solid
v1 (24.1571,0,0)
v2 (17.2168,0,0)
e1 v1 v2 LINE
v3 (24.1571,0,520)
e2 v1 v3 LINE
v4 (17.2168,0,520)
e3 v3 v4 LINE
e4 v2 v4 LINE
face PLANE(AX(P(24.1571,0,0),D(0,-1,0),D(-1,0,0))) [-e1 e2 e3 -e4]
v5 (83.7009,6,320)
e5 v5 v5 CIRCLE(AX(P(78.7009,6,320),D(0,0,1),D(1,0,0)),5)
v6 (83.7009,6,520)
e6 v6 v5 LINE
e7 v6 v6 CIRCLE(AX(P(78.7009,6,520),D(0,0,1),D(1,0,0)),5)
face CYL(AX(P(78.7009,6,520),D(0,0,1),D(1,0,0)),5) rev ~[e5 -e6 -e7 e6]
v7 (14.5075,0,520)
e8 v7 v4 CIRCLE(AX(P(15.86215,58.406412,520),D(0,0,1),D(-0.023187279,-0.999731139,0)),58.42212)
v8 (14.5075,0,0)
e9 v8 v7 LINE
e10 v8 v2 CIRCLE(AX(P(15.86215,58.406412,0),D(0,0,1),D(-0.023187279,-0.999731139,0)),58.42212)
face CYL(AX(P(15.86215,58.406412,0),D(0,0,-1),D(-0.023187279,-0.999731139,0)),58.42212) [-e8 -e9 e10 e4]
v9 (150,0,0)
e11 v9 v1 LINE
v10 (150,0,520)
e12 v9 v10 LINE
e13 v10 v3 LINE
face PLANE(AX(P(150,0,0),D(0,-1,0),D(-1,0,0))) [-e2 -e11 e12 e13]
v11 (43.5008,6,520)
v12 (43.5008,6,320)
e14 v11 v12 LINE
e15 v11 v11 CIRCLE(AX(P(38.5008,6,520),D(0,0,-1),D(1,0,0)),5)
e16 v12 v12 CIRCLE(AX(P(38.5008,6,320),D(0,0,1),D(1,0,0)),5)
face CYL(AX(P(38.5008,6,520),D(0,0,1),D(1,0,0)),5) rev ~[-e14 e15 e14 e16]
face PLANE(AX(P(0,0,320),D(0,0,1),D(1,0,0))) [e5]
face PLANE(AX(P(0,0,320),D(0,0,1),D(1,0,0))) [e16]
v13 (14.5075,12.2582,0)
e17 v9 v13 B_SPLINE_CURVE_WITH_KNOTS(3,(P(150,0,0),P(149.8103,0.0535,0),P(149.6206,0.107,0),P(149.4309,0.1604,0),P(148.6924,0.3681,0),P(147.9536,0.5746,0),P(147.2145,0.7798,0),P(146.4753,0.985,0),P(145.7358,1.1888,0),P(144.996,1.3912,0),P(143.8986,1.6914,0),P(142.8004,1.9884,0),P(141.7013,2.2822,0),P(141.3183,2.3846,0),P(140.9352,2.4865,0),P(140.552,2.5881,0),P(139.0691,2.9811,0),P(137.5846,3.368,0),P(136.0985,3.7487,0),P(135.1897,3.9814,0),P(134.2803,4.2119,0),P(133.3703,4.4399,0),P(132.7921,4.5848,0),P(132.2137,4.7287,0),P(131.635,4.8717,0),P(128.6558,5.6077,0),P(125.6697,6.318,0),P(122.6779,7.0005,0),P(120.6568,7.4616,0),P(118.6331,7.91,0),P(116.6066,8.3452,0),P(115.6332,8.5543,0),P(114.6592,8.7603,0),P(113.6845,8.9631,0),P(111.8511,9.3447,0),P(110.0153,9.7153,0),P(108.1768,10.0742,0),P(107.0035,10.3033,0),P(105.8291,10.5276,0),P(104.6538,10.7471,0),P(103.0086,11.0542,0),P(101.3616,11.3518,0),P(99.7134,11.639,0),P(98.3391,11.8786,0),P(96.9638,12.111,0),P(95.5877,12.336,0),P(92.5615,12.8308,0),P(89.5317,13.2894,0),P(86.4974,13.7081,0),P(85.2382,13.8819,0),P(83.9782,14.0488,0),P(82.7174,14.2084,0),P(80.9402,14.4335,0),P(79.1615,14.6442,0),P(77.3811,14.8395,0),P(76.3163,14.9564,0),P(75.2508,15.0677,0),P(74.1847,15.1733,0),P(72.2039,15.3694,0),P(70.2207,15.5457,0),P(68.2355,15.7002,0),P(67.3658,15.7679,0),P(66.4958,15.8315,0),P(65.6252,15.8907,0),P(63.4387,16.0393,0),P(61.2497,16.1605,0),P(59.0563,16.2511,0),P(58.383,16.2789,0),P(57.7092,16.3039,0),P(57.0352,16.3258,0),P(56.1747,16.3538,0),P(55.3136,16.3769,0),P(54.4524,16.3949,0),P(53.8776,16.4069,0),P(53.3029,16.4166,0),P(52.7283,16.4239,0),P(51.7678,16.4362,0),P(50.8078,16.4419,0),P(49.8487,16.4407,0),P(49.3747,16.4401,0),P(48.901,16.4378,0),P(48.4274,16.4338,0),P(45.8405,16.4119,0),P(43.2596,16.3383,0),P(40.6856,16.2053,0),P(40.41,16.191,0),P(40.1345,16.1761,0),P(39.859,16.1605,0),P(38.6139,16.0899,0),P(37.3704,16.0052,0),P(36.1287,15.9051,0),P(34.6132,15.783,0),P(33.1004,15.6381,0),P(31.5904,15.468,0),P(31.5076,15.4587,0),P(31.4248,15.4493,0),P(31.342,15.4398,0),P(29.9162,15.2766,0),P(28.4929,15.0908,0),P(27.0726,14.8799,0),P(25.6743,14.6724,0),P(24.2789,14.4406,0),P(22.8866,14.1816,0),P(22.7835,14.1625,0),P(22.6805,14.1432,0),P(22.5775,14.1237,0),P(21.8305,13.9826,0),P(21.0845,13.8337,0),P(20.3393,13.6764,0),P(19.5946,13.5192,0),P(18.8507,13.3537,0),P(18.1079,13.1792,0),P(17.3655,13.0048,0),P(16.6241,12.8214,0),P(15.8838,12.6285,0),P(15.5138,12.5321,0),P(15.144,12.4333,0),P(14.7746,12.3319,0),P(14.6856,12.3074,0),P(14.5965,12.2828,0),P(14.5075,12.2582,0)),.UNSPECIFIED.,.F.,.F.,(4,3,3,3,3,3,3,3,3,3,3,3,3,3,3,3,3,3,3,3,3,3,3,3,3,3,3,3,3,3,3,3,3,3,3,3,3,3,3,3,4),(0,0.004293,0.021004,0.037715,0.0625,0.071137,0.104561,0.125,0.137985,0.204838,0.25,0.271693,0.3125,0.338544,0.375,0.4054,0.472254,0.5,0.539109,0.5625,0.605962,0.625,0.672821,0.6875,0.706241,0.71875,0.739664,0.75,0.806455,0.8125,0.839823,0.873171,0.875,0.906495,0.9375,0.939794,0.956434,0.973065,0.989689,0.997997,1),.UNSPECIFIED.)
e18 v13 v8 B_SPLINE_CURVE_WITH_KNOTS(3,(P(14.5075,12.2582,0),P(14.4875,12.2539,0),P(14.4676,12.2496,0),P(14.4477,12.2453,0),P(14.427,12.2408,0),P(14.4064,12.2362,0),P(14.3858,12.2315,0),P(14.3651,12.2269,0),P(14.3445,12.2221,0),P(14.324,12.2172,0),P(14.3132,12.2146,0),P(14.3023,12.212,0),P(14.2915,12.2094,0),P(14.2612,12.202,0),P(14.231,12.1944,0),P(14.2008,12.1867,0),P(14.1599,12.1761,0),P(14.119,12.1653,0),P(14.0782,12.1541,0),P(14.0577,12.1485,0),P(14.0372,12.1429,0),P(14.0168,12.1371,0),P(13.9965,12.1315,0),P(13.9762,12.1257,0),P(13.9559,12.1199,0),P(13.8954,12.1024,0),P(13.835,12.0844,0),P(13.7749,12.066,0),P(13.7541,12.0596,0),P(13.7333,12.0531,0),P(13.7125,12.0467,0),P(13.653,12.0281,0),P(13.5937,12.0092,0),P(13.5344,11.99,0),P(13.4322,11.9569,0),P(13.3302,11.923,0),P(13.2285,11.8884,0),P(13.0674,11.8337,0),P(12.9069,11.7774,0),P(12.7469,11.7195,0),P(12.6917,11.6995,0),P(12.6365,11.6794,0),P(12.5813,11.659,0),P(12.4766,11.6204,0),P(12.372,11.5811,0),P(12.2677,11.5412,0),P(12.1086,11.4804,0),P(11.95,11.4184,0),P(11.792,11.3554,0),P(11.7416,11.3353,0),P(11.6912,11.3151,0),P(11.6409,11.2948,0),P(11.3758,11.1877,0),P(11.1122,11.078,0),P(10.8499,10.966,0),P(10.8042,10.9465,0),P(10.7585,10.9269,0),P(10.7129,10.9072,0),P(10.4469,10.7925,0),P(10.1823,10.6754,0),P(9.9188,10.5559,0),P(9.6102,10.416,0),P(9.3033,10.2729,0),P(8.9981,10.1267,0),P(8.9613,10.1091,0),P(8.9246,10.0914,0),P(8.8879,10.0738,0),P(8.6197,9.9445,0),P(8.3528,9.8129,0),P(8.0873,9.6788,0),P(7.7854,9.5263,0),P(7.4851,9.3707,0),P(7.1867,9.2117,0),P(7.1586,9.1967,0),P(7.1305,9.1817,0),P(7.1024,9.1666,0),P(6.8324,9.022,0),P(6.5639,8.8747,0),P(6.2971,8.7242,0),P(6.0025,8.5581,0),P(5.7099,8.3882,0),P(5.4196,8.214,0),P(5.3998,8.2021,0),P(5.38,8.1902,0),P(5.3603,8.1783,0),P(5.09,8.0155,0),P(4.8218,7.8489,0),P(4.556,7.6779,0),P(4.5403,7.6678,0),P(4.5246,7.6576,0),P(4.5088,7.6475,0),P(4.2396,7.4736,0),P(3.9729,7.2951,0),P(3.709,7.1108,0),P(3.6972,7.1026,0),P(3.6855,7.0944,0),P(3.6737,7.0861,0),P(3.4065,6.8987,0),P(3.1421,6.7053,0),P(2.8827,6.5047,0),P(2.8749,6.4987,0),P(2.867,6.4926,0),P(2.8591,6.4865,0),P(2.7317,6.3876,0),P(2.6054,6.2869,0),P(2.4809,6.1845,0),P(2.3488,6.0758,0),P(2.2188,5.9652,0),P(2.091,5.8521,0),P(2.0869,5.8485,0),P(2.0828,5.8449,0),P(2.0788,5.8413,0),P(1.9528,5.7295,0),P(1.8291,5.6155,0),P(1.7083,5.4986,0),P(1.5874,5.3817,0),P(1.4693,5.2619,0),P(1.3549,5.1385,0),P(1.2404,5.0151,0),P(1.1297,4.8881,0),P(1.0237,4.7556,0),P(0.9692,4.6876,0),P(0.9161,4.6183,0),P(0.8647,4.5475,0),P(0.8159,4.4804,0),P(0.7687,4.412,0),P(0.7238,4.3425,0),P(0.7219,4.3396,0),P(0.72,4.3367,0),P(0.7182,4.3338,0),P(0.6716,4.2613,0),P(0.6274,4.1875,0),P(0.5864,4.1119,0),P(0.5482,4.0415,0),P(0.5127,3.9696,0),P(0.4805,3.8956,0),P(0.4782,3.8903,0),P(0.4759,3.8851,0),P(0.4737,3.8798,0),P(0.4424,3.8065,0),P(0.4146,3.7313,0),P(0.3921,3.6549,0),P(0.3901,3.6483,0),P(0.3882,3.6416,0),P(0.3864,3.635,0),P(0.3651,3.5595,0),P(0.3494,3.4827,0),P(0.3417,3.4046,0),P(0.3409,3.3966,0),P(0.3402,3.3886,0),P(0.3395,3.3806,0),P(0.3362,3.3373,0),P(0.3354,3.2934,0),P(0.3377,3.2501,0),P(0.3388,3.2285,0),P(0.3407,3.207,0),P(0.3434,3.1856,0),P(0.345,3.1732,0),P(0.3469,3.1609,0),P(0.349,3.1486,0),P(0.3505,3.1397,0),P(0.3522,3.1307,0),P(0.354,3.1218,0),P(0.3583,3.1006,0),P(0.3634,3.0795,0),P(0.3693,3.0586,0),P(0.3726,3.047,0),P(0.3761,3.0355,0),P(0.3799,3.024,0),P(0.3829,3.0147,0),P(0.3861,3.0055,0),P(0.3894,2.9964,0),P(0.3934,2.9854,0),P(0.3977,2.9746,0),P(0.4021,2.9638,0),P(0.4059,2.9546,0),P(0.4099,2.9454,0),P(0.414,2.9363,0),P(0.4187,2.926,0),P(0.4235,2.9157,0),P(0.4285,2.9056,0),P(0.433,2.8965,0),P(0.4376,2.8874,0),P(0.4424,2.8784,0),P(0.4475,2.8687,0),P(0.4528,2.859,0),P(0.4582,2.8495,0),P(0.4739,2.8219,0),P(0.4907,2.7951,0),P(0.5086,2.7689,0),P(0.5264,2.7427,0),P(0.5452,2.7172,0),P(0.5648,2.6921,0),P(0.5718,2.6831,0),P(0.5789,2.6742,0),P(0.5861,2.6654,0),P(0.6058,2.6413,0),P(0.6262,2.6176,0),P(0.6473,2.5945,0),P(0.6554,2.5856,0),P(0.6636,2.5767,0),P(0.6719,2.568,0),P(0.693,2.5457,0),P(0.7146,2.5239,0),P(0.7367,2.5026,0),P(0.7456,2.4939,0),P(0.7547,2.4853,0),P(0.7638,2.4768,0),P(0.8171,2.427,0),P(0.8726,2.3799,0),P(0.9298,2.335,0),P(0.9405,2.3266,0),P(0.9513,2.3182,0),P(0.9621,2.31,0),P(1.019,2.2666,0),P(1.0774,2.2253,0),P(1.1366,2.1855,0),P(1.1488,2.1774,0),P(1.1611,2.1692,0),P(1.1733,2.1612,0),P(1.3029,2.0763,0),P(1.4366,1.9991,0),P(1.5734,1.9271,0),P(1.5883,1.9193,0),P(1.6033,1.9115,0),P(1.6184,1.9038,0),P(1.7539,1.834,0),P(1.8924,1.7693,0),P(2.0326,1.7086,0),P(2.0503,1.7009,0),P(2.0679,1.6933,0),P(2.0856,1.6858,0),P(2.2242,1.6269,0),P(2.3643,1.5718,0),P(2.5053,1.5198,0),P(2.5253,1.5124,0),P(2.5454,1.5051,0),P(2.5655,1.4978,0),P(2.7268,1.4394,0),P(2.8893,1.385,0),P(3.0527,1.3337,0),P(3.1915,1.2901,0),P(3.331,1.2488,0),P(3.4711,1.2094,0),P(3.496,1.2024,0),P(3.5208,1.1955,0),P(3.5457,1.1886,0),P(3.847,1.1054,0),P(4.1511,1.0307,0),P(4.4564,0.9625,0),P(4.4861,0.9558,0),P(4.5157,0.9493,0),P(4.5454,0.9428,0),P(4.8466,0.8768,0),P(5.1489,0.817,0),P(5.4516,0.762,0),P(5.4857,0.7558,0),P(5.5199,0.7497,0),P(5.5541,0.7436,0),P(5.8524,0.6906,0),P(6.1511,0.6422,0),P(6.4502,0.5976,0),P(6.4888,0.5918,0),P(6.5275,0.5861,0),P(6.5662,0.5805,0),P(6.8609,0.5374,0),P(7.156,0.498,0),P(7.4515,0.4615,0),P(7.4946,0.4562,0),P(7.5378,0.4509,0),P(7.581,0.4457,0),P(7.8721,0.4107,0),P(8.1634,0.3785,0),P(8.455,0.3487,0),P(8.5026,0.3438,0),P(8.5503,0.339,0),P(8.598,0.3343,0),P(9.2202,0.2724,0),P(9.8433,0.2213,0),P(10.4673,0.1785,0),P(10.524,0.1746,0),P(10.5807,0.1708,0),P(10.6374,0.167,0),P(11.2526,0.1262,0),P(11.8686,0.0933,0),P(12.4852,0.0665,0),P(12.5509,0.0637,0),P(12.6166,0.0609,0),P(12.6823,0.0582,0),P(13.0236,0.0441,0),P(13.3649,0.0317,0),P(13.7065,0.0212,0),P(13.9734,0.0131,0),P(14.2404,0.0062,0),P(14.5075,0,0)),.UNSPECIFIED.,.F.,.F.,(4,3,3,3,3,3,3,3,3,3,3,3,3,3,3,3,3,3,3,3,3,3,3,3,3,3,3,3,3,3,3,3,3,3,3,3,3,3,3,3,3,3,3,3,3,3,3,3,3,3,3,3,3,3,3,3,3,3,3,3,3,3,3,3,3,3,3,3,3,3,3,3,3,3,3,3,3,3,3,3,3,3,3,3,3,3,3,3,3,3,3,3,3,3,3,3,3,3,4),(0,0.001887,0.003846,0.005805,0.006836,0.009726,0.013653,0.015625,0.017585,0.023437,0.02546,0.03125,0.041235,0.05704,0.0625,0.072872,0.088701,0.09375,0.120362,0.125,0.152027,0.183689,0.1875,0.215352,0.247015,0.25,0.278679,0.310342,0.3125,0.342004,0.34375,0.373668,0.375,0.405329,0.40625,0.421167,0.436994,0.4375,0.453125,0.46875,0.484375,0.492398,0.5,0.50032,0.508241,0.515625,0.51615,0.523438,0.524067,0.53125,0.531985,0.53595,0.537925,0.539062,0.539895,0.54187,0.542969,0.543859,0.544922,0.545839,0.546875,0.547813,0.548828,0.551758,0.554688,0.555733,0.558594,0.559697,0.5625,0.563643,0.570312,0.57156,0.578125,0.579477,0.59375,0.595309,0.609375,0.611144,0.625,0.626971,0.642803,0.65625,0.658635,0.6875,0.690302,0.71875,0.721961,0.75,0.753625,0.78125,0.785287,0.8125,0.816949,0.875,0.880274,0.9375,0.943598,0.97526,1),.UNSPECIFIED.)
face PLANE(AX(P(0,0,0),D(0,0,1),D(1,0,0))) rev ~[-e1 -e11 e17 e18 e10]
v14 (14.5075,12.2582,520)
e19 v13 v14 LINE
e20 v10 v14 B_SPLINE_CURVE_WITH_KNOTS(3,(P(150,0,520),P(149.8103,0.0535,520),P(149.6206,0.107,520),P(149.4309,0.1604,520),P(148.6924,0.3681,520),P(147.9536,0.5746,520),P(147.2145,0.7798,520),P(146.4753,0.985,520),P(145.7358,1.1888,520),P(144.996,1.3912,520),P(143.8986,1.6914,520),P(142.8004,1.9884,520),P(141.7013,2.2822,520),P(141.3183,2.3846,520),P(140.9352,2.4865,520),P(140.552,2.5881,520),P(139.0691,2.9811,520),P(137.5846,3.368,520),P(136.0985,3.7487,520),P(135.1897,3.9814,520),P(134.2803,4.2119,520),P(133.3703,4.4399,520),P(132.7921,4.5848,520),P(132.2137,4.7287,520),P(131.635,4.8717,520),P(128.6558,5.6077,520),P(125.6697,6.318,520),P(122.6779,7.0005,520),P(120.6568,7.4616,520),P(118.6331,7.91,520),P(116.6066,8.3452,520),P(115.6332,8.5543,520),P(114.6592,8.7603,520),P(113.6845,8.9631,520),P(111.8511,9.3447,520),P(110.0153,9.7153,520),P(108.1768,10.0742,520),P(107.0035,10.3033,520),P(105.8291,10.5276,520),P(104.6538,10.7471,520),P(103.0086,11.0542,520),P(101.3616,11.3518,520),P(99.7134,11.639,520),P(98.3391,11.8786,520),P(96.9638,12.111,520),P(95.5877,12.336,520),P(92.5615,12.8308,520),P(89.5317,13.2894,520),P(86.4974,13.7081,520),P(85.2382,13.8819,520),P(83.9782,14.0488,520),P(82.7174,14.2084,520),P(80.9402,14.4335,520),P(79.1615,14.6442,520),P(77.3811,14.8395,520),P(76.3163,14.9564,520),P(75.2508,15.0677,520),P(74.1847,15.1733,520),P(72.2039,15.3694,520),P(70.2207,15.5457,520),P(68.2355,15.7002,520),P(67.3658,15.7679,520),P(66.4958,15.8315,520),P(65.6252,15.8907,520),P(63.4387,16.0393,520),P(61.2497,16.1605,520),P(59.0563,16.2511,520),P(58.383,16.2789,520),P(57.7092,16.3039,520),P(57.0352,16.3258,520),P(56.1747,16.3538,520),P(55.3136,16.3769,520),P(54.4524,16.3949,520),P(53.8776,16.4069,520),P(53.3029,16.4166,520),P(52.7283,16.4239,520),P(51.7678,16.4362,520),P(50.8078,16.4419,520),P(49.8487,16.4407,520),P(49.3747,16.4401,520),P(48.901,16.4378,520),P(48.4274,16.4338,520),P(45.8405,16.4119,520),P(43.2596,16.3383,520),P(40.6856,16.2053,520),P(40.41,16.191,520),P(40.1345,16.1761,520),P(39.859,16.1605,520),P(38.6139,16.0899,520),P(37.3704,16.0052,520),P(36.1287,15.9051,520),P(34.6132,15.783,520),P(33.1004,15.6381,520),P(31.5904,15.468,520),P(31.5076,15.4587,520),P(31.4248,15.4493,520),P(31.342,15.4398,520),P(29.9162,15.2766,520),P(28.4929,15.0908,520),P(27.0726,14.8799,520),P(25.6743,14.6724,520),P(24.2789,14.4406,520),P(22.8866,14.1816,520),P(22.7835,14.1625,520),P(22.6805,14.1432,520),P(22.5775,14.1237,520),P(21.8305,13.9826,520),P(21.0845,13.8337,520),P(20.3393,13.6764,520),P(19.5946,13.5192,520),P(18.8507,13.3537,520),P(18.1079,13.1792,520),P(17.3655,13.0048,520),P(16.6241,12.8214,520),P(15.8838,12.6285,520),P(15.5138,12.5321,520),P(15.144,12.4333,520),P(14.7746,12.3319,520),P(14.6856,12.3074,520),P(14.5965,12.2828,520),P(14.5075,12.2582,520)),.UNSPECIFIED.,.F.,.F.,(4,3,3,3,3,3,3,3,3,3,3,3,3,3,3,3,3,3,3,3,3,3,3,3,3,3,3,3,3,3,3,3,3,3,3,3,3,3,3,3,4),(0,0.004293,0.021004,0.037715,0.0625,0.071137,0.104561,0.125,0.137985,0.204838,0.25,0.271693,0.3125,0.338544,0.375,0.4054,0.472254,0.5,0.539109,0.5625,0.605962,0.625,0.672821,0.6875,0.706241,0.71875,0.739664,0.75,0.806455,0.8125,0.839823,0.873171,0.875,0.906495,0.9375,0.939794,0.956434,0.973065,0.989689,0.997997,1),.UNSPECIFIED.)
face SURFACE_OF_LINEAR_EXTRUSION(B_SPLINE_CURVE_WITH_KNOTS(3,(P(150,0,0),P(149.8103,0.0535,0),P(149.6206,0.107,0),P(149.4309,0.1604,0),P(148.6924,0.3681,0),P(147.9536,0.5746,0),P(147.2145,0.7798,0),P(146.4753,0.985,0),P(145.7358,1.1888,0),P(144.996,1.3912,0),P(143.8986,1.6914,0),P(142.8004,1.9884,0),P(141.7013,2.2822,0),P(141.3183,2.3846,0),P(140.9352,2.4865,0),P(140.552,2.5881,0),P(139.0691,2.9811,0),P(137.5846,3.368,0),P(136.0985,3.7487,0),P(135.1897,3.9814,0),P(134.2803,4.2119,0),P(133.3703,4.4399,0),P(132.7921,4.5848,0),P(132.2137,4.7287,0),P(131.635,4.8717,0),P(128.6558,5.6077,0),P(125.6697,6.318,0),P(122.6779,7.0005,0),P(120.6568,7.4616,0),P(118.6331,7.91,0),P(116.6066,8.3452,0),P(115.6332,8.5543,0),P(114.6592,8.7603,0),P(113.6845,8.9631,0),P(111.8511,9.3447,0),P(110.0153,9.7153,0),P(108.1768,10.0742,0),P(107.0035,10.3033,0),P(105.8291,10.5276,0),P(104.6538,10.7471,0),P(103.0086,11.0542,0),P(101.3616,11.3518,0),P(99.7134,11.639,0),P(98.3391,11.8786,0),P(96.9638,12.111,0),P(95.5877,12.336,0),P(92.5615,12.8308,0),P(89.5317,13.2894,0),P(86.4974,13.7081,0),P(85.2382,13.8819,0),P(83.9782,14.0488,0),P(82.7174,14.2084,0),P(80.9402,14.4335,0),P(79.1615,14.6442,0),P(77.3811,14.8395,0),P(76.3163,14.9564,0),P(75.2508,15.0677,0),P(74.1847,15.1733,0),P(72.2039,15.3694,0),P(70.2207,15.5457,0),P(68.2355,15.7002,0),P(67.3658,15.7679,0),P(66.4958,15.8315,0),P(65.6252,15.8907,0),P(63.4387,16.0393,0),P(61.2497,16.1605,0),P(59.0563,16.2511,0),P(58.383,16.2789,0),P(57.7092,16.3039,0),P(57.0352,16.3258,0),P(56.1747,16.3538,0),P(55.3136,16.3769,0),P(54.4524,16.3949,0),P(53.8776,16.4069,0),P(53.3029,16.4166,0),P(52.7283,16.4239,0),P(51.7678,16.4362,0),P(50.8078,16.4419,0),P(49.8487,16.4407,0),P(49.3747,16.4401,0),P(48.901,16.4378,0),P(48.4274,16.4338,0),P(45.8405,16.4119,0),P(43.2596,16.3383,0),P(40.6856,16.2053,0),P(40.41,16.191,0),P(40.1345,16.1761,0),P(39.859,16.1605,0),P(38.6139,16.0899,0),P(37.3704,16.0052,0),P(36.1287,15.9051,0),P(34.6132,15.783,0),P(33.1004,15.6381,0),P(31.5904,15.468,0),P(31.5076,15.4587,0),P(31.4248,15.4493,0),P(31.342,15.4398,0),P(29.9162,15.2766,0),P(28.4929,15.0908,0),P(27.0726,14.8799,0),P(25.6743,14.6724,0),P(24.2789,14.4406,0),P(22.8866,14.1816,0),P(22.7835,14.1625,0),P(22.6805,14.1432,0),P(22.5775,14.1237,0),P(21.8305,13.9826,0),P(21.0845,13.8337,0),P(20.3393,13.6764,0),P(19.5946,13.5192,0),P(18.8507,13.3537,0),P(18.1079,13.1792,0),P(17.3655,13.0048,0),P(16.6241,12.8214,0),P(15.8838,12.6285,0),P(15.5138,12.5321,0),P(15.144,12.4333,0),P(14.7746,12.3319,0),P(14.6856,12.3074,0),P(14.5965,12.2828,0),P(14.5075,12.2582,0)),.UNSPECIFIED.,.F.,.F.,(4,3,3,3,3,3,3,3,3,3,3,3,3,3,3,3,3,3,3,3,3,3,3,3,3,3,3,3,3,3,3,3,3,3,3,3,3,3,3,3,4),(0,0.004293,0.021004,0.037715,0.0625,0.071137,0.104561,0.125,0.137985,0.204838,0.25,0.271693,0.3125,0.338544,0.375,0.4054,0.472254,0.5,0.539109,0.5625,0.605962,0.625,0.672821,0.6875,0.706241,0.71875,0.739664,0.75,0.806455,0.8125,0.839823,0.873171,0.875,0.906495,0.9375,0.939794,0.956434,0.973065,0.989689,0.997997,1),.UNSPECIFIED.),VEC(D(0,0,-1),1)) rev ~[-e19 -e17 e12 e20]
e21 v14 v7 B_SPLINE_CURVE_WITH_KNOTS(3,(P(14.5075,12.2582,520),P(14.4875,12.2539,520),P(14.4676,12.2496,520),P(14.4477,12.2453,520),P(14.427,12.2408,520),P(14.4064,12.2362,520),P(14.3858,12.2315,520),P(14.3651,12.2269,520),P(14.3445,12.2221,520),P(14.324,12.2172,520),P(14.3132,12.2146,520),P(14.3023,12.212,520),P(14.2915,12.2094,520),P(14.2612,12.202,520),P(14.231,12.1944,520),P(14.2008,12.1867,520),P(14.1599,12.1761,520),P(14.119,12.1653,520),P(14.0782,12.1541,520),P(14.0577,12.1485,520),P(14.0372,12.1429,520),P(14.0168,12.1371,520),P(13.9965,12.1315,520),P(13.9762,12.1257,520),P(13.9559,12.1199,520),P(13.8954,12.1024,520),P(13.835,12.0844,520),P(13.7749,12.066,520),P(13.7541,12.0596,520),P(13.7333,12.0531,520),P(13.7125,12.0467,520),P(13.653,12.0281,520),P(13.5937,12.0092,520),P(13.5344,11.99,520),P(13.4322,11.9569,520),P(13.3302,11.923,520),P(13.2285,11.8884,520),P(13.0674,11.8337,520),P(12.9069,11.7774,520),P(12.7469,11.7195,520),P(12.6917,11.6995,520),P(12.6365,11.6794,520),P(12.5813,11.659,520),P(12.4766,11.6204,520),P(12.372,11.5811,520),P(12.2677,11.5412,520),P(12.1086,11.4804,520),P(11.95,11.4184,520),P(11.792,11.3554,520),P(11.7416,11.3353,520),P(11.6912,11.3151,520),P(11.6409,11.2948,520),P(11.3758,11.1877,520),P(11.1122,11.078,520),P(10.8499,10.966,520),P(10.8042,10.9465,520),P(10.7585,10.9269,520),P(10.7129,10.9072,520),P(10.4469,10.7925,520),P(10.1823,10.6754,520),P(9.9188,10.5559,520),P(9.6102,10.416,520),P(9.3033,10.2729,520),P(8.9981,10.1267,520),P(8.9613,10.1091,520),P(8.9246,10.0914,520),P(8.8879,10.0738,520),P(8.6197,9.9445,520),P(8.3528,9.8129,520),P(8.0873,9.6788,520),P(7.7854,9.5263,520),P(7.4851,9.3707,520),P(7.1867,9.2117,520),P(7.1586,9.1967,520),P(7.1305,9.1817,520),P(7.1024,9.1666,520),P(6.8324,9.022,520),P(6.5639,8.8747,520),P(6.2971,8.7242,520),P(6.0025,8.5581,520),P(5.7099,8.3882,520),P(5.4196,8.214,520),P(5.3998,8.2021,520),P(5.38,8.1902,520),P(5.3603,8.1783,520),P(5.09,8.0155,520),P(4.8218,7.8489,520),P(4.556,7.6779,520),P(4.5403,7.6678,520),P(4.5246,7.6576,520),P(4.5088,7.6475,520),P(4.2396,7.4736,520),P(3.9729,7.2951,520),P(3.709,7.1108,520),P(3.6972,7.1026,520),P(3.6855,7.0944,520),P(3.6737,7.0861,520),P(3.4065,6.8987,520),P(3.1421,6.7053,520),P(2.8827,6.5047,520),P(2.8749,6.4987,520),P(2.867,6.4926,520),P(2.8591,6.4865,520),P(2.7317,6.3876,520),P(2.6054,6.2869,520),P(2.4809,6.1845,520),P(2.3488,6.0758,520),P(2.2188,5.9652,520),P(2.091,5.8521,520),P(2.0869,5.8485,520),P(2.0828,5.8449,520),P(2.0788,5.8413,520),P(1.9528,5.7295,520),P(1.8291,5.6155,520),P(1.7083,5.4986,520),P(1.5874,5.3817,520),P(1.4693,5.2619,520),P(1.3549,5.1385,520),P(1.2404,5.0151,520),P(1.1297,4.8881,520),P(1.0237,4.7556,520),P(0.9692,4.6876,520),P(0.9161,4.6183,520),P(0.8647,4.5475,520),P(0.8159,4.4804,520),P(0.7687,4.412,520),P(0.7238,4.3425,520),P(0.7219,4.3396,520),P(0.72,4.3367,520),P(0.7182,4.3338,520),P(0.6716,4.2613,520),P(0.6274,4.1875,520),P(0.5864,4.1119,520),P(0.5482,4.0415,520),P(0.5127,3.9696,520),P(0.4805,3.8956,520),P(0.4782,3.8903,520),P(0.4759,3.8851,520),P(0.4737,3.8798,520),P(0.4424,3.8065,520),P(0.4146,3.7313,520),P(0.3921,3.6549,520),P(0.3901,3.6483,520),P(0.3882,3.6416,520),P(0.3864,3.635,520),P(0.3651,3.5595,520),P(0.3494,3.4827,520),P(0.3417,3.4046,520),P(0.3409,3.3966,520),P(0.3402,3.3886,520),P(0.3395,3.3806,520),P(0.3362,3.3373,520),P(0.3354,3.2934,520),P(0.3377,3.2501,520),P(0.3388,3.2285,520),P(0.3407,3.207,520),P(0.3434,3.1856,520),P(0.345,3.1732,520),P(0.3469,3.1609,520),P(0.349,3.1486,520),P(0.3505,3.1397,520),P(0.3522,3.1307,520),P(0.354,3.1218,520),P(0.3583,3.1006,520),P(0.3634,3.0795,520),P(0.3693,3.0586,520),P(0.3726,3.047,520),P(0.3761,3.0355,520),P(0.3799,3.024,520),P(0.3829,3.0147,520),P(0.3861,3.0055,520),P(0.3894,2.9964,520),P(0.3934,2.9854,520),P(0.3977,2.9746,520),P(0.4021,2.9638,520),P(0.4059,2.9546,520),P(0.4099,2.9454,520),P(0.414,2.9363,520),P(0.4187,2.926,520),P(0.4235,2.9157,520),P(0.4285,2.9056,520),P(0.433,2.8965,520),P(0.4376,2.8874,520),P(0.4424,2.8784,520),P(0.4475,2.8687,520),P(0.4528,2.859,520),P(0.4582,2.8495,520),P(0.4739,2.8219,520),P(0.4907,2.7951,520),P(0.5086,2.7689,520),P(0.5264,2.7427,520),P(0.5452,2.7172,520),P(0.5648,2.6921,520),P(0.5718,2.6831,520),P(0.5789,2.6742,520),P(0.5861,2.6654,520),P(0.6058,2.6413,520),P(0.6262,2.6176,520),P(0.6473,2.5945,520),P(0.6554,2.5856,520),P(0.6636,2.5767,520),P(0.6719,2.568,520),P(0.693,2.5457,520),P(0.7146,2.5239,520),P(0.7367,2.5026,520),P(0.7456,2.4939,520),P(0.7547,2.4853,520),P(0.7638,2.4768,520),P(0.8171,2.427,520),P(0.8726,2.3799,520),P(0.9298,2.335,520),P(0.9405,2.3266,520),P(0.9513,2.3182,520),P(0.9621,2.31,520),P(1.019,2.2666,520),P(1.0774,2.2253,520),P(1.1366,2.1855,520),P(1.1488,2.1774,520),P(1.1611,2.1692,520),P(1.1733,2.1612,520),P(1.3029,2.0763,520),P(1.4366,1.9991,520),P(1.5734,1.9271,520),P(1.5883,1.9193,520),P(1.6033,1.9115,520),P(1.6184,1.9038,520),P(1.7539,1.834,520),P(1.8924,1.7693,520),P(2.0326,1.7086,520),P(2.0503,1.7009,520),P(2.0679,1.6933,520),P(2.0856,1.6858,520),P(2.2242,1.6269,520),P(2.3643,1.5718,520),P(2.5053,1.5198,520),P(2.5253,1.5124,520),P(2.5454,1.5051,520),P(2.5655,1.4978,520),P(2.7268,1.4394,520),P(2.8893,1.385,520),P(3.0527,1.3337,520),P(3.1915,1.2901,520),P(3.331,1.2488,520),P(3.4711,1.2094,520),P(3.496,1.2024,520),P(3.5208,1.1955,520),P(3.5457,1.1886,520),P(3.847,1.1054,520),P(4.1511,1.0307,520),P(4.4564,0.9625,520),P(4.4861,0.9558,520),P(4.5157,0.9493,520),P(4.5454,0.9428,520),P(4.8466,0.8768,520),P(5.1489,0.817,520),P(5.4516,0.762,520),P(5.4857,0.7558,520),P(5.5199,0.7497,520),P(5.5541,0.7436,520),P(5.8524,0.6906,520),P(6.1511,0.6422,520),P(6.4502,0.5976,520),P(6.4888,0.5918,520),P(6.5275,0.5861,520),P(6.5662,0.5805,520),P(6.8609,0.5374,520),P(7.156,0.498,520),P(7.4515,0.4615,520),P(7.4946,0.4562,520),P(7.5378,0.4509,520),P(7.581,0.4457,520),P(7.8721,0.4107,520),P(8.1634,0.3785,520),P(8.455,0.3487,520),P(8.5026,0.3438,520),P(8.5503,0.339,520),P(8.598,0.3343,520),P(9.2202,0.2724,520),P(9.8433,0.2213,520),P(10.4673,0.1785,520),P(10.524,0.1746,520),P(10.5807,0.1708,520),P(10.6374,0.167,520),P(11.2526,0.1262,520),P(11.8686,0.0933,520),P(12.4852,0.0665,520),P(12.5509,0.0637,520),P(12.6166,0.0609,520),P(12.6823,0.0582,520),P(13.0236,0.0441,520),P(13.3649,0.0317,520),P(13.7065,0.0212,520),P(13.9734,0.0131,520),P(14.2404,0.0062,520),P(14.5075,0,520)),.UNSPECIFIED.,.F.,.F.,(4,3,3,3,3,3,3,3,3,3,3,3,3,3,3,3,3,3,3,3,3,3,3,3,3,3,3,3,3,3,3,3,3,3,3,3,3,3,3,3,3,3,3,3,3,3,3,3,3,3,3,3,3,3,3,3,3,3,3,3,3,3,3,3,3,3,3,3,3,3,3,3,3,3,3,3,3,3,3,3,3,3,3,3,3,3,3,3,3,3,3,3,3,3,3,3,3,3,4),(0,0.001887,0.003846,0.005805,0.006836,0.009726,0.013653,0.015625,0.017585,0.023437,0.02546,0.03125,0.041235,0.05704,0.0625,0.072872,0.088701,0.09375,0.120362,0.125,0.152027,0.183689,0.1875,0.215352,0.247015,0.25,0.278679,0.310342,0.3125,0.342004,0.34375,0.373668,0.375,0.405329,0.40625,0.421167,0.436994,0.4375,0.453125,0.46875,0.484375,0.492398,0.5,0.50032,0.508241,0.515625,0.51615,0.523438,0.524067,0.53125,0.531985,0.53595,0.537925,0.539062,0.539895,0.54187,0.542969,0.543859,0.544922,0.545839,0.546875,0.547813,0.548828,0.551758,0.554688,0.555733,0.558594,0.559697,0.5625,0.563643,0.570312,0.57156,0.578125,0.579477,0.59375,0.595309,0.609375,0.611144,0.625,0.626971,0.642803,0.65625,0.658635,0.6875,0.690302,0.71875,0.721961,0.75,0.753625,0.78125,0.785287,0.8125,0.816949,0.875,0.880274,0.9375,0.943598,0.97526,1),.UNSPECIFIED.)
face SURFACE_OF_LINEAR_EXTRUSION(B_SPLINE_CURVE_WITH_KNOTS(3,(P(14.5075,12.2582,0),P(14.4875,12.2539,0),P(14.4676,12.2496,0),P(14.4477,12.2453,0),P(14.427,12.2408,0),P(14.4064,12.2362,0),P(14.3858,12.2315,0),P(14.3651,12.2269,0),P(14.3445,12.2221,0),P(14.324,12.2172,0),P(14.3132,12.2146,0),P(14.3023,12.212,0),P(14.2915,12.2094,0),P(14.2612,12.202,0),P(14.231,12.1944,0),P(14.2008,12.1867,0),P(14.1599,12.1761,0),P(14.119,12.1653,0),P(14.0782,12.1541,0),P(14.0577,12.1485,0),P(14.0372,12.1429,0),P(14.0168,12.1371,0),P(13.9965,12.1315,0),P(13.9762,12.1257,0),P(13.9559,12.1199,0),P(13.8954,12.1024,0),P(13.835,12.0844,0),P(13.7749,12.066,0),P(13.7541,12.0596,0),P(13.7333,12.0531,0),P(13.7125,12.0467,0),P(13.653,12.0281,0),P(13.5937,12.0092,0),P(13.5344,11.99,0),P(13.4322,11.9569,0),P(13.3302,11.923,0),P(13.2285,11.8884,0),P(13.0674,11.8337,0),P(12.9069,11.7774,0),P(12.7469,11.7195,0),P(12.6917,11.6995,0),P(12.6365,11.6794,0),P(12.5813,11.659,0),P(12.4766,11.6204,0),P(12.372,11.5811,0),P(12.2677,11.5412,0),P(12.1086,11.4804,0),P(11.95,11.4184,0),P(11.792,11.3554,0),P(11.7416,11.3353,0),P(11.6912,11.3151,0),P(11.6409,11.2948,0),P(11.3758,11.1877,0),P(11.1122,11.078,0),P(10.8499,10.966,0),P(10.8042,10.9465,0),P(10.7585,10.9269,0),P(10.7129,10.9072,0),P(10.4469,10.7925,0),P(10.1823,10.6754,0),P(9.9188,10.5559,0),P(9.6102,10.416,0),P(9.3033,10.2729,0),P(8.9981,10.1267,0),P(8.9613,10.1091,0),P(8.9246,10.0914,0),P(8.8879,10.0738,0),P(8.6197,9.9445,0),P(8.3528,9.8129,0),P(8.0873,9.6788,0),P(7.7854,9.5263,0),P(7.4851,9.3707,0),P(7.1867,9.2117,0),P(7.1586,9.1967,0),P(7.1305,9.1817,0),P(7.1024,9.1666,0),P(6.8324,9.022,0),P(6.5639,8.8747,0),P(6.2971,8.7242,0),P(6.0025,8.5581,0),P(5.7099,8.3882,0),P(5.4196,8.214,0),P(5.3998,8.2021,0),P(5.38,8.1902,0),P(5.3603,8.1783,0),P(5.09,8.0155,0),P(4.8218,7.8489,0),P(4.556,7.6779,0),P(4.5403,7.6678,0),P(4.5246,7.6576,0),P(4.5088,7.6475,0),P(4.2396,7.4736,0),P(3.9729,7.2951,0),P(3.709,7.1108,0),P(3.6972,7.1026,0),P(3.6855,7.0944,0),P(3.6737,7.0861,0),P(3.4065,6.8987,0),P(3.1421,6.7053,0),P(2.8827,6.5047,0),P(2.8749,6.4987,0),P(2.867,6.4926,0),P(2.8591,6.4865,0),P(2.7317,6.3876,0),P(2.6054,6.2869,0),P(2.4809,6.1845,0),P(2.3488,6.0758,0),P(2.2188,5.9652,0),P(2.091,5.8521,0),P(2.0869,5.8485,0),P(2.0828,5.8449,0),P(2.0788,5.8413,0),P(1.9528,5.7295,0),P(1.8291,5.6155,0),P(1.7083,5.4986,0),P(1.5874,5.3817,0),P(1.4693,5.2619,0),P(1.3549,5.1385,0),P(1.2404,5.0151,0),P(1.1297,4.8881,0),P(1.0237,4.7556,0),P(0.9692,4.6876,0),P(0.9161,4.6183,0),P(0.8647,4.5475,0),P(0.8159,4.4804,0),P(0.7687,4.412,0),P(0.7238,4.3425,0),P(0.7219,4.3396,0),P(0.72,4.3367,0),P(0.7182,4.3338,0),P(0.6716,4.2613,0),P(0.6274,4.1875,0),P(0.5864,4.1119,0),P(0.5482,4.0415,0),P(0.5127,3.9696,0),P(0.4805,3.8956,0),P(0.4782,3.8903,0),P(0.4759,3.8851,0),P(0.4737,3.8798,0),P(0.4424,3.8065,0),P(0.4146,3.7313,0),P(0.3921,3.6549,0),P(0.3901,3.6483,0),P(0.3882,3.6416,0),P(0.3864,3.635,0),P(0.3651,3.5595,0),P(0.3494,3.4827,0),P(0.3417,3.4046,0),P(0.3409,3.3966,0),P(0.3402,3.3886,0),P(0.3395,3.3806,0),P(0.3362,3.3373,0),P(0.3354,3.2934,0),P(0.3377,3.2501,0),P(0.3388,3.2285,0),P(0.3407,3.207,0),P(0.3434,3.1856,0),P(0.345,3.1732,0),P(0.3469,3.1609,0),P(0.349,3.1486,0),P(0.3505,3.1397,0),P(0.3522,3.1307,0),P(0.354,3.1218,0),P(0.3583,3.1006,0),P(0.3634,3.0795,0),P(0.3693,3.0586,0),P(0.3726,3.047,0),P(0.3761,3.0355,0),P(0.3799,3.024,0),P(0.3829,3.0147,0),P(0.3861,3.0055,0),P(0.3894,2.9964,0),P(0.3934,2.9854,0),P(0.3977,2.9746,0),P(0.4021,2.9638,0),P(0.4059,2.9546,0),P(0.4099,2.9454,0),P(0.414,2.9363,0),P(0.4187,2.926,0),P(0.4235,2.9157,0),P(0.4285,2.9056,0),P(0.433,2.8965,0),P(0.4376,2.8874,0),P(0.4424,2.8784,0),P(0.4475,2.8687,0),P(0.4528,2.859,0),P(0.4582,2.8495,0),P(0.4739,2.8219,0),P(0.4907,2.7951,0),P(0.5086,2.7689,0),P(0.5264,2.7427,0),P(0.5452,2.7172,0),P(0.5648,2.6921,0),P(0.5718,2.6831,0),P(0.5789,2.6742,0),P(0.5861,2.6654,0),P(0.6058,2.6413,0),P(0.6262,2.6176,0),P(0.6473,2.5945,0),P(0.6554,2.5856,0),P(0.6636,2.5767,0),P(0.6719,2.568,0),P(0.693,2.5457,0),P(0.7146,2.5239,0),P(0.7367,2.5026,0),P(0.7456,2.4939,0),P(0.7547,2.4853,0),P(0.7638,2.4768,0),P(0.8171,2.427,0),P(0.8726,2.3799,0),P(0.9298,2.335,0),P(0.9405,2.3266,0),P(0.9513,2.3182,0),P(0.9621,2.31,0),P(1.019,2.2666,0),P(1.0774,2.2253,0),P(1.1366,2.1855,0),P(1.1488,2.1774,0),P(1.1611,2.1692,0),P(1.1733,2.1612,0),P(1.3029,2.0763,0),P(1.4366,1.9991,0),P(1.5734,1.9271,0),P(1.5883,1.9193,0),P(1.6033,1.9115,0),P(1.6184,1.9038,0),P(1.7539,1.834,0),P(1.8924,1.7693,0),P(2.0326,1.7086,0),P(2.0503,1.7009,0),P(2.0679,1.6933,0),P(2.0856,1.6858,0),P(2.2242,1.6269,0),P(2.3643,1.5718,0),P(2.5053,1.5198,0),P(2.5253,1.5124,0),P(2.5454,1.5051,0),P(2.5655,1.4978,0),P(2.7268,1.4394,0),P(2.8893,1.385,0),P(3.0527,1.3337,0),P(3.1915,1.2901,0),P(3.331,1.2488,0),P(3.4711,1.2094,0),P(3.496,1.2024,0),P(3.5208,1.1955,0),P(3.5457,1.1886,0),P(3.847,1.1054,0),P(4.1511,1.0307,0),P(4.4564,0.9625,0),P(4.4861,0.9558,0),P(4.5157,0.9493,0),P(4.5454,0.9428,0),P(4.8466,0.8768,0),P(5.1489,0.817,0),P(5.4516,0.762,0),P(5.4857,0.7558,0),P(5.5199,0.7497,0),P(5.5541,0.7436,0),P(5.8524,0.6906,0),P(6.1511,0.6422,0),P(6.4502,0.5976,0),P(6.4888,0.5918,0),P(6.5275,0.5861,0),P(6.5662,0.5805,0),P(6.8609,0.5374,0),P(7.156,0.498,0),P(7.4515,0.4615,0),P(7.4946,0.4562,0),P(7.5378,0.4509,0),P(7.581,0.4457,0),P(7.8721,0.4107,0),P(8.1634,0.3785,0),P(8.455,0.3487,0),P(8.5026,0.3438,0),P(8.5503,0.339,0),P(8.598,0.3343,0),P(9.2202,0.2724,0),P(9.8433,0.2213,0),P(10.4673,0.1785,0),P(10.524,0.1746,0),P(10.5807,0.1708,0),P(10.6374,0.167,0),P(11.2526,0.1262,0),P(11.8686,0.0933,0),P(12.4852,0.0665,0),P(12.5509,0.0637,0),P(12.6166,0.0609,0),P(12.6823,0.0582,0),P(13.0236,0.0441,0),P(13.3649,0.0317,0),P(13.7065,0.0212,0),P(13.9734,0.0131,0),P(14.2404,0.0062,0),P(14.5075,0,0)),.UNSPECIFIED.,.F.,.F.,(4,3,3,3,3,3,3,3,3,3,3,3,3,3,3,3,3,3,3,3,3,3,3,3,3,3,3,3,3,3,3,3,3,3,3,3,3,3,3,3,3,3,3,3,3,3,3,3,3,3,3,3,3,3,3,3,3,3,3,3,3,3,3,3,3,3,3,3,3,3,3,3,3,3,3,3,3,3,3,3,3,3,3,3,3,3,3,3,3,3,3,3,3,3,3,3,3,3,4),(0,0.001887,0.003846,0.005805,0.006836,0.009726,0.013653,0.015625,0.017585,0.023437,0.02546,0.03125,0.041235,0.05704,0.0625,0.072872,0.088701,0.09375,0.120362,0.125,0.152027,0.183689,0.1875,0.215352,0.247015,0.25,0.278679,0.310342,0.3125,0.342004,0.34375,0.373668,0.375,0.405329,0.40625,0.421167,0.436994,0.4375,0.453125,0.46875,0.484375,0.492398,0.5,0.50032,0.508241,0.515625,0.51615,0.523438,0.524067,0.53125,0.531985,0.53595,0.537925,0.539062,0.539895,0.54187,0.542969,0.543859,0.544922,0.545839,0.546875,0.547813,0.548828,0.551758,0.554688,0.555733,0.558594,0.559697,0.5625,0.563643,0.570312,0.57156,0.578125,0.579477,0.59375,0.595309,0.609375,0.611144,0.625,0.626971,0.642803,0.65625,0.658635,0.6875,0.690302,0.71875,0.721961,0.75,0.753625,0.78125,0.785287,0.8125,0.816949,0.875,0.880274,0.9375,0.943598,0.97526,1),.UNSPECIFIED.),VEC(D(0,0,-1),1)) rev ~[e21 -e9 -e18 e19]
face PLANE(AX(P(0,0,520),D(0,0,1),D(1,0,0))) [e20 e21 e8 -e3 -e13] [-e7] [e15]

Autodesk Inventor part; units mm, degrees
ref_plane "YZ Plane" through (0, 0, 0) normal (1, 0, 0) x (0, 1, 0)
ref_plane "XZ Plane" through (0, 0, 0) normal (0, 1, 0) x (-1, 0, 0)
ref_plane "XY Plane" through (0, 0, 0) normal (0, 0, 1) x (1, 0, 0)
sketch "Эскиз1" plane through (0, 0, 0) normal (0, 0, 1) x (1, 0, 0)
  spline S0 degree 3 poles (150, 0) (149.8103, 0.0535) (149.6206, 0.107) (149.4309, 0.1604) (148.6924, 0.3681) (147.9536, 0.5746) (147.2145, 0.7798) (146.4753, 0.985) (145.7358, 1.1888) (144.996, 1.3912) (143.8986, 1.6914) (142.8004, 1.9884) (141.7013, 2.2822) (141.3183, 2.3846) (140.9352, 2.4865) (140.552, 2.5881) (139.0691, 2.9811) (137.5846, 3.368) (136.0985, 3.7487) (135.1897, 3.9814) (134.2803, 4.2119) (133.3703, 4.4399) (132.7921, 4.5848) (132.2137, 4.7287) (131.635, 4.8717) (128.6558, 5.6077) (125.6697, 6.318) (122.6779, 7.0005) (120.6568, 7.4616) (118.6331, 7.91) (116.6066, 8.3452) (115.6332, 8.5543) (114.6592, 8.7603) (113.6845, 8.9631) (111.8511, 9.3447) (110.0153, 9.7153) (108.1768, 10.0742) (107.0035, 10.3033) (105.8291, 10.5276) (104.6538, 10.7471) (103.0086, 11.0542) (101.3616, 11.3518) (99.7134, 11.639) (98.3391, 11.8786) (96.9638, 12.111) (95.5877, 12.336) (92.5615, 12.8308) (89.5317, 13.2894) (86.4974, 13.7081) (85.2382, 13.8819) (83.9782, 14.0488) (82.7174, 14.2084) (80.9402, 14.4335) (79.1615, 14.6442) (77.3811, 14.8395) (76.3163, 14.9564) (75.2508, 15.0677) (74.1847, 15.1733) (72.2039, 15.3694) (70.2207, 15.5457) (68.2355, 15.7002) (67.3658, 15.7679) (66.4958, 15.8315) (65.6252, 15.8907) (63.4387, 16.0393) (61.2497, 16.1605) (59.0563, 16.2511) (58.383, 16.2789) (57.7092, 16.3039) (57.0352, 16.3258) (56.1747, 16.3538) (55.3136, 16.3769) (54.4524, 16.3949) (53.8776, 16.4069) (53.3029, 16.4166) (52.7283, 16.4239) (51.7678, 16.4362) (50.8078, 16.4419) (49.8487, 16.4407) (49.3747, 16.4401) (48.901, 16.4378) (48.4274, 16.4338) (45.8405, 16.4119) (43.2596, 16.3383) (40.6856, 16.2053) (40.41, 16.191) (40.1345, 16.1761) (39.859, 16.1605) (38.6139, 16.0899) (37.3704, 16.0052) (36.1287, 15.9051) (34.6132, 15.783) (33.1004, 15.6381) (31.5904, 15.468) (31.5076, 15.4587) (31.4248, 15.4493) (31.342, 15.4398) (29.9162, 15.2766) (28.4929, 15.0908) (27.0726, 14.8799) (25.6743, 14.6724) (24.2789, 14.4406) (22.8866, 14.1816) (22.7835, 14.1625) (22.6805, 14.1432) (22.5775, 14.1237) (21.8305, 13.9826) (21.0845, 13.8337) (20.3393, 13.6764) (19.5946, 13.5192) (18.8507, 13.3537) (18.1079, 13.1792) (17.3655, 13.0048) (16.6241, 12.8214) (15.8838, 12.6285) (15.5138, 12.5321) (15.144, 12.4333) (14.7746, 12.3319) (14.6856, 12.3074) (14.5965, 12.2828) (14.5075, 12.2582) knots 0 0 0 0 0.004293 0.004293 0.004293 0.021004 0.021004 0.021004 0.037715 0.037715 0.037715 0.0625 0.0625 0.0625 0.071137 0.071137 0.071137 0.104561 0.104561 0.104561 0.125 0.125 0.125 0.137985 0.137985 0.137985 0.204838 0.204838 0.204838 0.25 0.25 0.25 0.271693 0.271693 0.271693 0.3125 0.3125 0.3125 0.338544 0.338544 0.338544 0.375 0.375 0.375 0.4054 0.4054 0.4054 0.472254 0.472254 0.472254 0.5 0.5 0.5 0.539109 0.539109 0.539109 0.5625 0.5625 0.5625 0.605962 0.605962 0.605962 0.625 0.625 0.625 0.672821 0.672821 0.672821 0.6875 0.6875 0.6875 0.706241 0.706241 0.706241 0.71875 0.71875 0.71875 0.739664 0.739664 0.739664 0.75 0.75 0.75 0.806455 0.806455 0.806455 0.8125 0.8125 0.8125 0.839823 0.839823 0.839823 0.873171 0.873171 0.873171 0.875 0.875 0.875 0.906495 0.906495 0.906495 0.9375 0.9375 0.9375 0.939794 0.939794 0.939794 0.956434 0.956434 0.956434 0.973065 0.973065 0.973065 0.989689 0.989689 0.989689 0.997997 0.997997 0.997997 1 1 1 1
  spline S1 degree 3 poles (14.5075, 12.2582) (14.4875, 12.2539) (14.4676, 12.2496) (14.4477, 12.2453) (14.427, 12.2408) (14.4064, 12.2362) (14.3858, 12.2315) (14.3651, 12.2269) (14.3445, 12.2221) (14.324, 12.2172) (14.3132, 12.2146) (14.3023, 12.212) (14.2915, 12.2094) (14.2612, 12.202) (14.231, 12.1944) (14.2008, 12.1867) (14.1599, 12.1761) (14.119, 12.1653) (14.0782, 12.1541) (14.0577, 12.1485) (14.0372, 12.1429) (14.0168, 12.1371) (13.9965, 12.1315) (13.9762, 12.1257) (13.9559, 12.1199) (13.8954, 12.1024) (13.835, 12.0844) (13.7749, 12.066) (13.7541, 12.0596) (13.7333, 12.0531) (13.7125, 12.0467) (13.653, 12.0281) (13.5937, 12.0092) (13.5344, 11.99) (13.4322, 11.9569) (13.3302, 11.923) (13.2285, 11.8884) (13.0674, 11.8337) (12.9069, 11.7774) (12.7469, 11.7195) (12.6917, 11.6995) (12.6365, 11.6794) (12.5813, 11.659) (12.4766, 11.6204) (12.372, 11.5811) (12.2677, 11.5412) (12.1086, 11.4804) (11.95, 11.4184) (11.792, 11.3554) (11.7416, 11.3353) (11.6912, 11.3151) (11.6409, 11.2948) (11.3758, 11.1877) (11.1122, 11.078) (10.8499, 10.966) (10.8042, 10.9465) (10.7585, 10.9269) (10.7129, 10.9072) (10.4469, 10.7925) (10.1823, 10.6754) (9.9188, 10.5559) (9.6102, 10.416) (9.3033, 10.2729) (8.9981, 10.1267) (8.9613, 10.1091) (8.9246, 10.0914) (8.8879, 10.0738) (8.6197, 9.9445) (8.3528, 9.8129) (8.0873, 9.6788) (7.7854, 9.5263) (7.4851, 9.3707) (7.1867, 9.2117) (7.1586, 9.1967) (7.1305, 9.1817) (7.1024, 9.1666) (6.8324, 9.022) (6.5639, 8.8747) (6.2971, 8.7242) (6.0025, 8.5581) (5.7099, 8.3882) (5.4196, 8.214) (5.3998, 8.2021) (5.38, 8.1902) (5.3603, 8.1783) (5.09, 8.0155) (4.8218, 7.8489) (4.556, 7.6779) (4.5403, 7.6678) (4.5246, 7.6576) (4.5088, 7.6475) (4.2396, 7.4736) (3.9729, 7.2951) (3.709, 7.1108) (3.6972, 7.1026) (3.6855, 7.0944) (3.6737, 7.0861) (3.4065, 6.8987) (3.1421, 6.7053) (2.8827, 6.5047) (2.8749, 6.4987) (2.867, 6.4926) (2.8591, 6.4865) (2.7317, 6.3876) (2.6054, 6.2869) (2.4809, 6.1845) (2.3488, 6.0758) (2.2188, 5.9652) (2.091, 5.8521) (2.0869, 5.8485) (2.0828, 5.8449) (2.0788, 5.8413) (1.9528, 5.7295) (1.8291, 5.6155) (1.7083, 5.4986) (1.5874, 5.3817) (1.4693, 5.2619) (1.3549, 5.1385) (1.2404, 5.0151) (1.1297, 4.8881) (1.0237, 4.7556) (0.9692, 4.6876) (0.9161, 4.6183) (0.8647, 4.5475) (0.8159, 4.4804) (0.7687, 4.412) (0.7238, 4.3425) (0.7219, 4.3396) (0.72, 4.3367) (0.7182, 4.3338) (0.6716, 4.2613) (0.6274, 4.1875) (0.5864, 4.1119) (0.5482, 4.0415) (0.5127, 3.9696) (0.4805, 3.8956) (0.4782, 3.8903) (0.4759, 3.8851) (0.4737, 3.8798) (0.4424, 3.8065) (0.4146, 3.7313) (0.3921, 3.6549) (0.3901, 3.6483) (0.3882, 3.6416) (0.3864, 3.635) (0.3651, 3.5595) (0.3494, 3.4827) (0.3417, 3.4046) (0.3409, 3.3966) (0.3402, 3.3886) (0.3395, 3.3806) (0.3362, 3.3373) (0.3354, 3.2934) (0.3377, 3.2501) (0.3388, 3.2285) (0.3407, 3.207) (0.3434, 3.1856) (0.345, 3.1732) (0.3469, 3.1609) (0.349, 3.1486) (0.3505, 3.1397) (0.3522, 3.1307) (0.354, 3.1218) (0.3583, 3.1006) (0.3634, 3.0795) (0.3693, 3.0586) (0.3726, 3.047) (0.3761, 3.0355) (0.3799, 3.024) (0.3829, 3.0147) (0.3861, 3.0055) (0.3894, 2.9964) (0.3934, 2.9854) (0.3977, 2.9746) (0.4021, 2.9638) (0.4059, 2.9546) (0.4099, 2.9454) (0.414, 2.9363) (0.4187, 2.926) (0.4235, 2.9157) (0.4285, 2.9056) (0.433, 2.8965) (0.4376, 2.8874) (0.4424, 2.8784) (0.4475, 2.8687) (0.4528, 2.859) (0.4582, 2.8495) (0.4739, 2.8219) (0.4907, 2.7951) (0.5086, 2.7689) (0.5264, 2.7427) (0.5452, 2.7172) (0.5648, 2.6921) (0.5718, 2.6831) (0.5789, 2.6742) (0.5861, 2.6654) (0.6058, 2.6413) (0.6262, 2.6176) (0.6473, 2.5945) (0.6554, 2.5856) (0.6636, 2.5767) (0.6719, 2.568) (0.693, 2.5457) (0.7146, 2.5239) (0.7367, 2.5026) (0.7456, 2.4939) (0.7547, 2.4853) (0.7638, 2.4768) (0.8171, 2.427) (0.8726, 2.3799) (0.9298, 2.335) (0.9405, 2.3266) (0.9513, 2.3182) (0.9621, 2.31) (1.019, 2.2666) (1.0774, 2.2253) (1.1366, 2.1855) (1.1488, 2.1774) (1.1611, 2.1692) (1.1733, 2.1612) (1.3029, 2.0763) (1.4366, 1.9991) (1.5734, 1.9271) (1.5883, 1.9193) (1.6033, 1.9115) (1.6184, 1.9038) (1.7539, 1.834) (1.8924, 1.7693) (2.0326, 1.7086) (2.0503, 1.7009) (2.0679, 1.6933) (2.0856, 1.6858) (2.2242, 1.6269) (2.3643, 1.5718) (2.5053, 1.5198) (2.5253, 1.5124) (2.5454, 1.5051) (2.5655, 1.4978) (2.7268, 1.4394) (2.8893, 1.385) (3.0527, 1.3337) (3.1915, 1.2901) (3.331, 1.2488) (3.4711, 1.2094) (3.496, 1.2024) (3.5208, 1.1955) (3.5457, 1.1886) (3.847, 1.1054) (4.1511, 1.0307) (4.4564, 0.9625) (4.4861, 0.9558) (4.5157, 0.9493) (4.5454, 0.9428) (4.8466, 0.8768) (5.1489, 0.817) (5.4516, 0.762) (5.4857, 0.7558) (5.5199, 0.7497) (5.5541, 0.7436) (5.8524, 0.6906) (6.1511, 0.6422) (6.4502, 0.5976) (6.4888, 0.5918) (6.5275, 0.5861) (6.5662, 0.5805) (6.8609, 0.5374) (7.156, 0.498) (7.4515, 0.4615) (7.4946, 0.4562) (7.5378, 0.4509) (7.581, 0.4457) (7.8721, 0.4107) (8.1634, 0.3785) (8.455, 0.3487) (8.5026, 0.3438) (8.5503, 0.339) (8.598, 0.3343) (9.2202, 0.2724) (9.8433, 0.2213) (10.4673, 0.1785) (10.524, 0.1746) (10.5807, 0.1708) (10.6374, 0.167) (11.2526, 0.1262) (11.8686, 0.0933) (12.4852, 0.0665) (12.5509, 0.0637) (12.6166, 0.0609) (12.6823, 0.0582) (13.0236, 0.0441) (13.3649, 0.0317) (13.7065, 0.0212) (13.9734, 0.0131) (14.2404, 0.0062) (14.5075, 0) knots 0 0 0 0 0.001887 0.001887 0.001887 0.003846 0.003846 0.003846 0.005805 0.005805 0.005805 0.006836 0.006836 0.006836 0.009726 0.009726 0.009726 0.013653 0.013653 0.013653 0.015625 0.015625 0.015625 0.017585 0.017585 0.017585 0.023437 0.023437 0.023437 0.02546 0.02546 0.02546 0.03125 0.03125 0.03125 0.041235 0.041235 0.041235 0.05704 0.05704 0.05704 0.0625 0.0625 0.0625 0.072872 0.072872 0.072872 0.088701 0.088701 0.088701 0.09375 0.09375 0.09375 0.120362 0.120362 0.120362 0.125 0.125 0.125 0.152027 0.152027 0.152027 0.183689 0.183689 0.183689 0.1875 0.1875 0.1875 0.215352 0.215352 0.215352 0.247015 0.247015 0.247015 0.25 0.25 0.25 0.278679 0.278679 0.278679 0.310342 0.310342 0.310342 0.3125 0.3125 0.3125 0.342004 0.342004 0.342004 0.34375 0.34375 0.34375 0.373668 0.373668 0.373668 0.375 0.375 0.375 0.405329 0.405329 0.405329 0.40625 0.40625 0.40625 0.421167 0.421167 0.421167 0.436994 0.436994 0.436994 0.4375 0.4375 0.4375 0.453125 0.453125 0.453125 0.46875 0.46875 0.46875 0.484375 0.484375 0.484375 0.492398 0.492398 0.492398 0.5 0.5 0.5 0.50032 0.50032 0.50032 0.508241 0.508241 0.508241 0.515625 0.515625 0.515625 0.51615 0.51615 0.51615 0.523438 0.523438 0.523438 0.524067 0.524067 0.524067 0.53125 0.53125 0.53125 0.531985 0.531985 0.531985 0.53595 0.53595 0.53595 0.537925 0.537925 0.537925 0.539062 0.539062 0.539062 0.539895 0.539895 0.539895 0.54187 0.54187 0.54187 0.542969 0.542969 0.542969 0.543859 0.543859 0.543859 0.544922 0.544922 0.544922 0.545839 0.545839 0.545839 0.546875 0.546875 0.546875 0.547813 0.547813 0.547813 0.548828 0.548828 0.548828 0.551758 0.551758 0.551758 0.554688 0.554688 0.554688 0.555733 0.555733 0.555733 0.558594 0.558594 0.558594 0.559697 0.559697 0.559697 0.5625 0.5625 0.5625 0.563643 0.563643 0.563643 0.570312 0.570312 0.570312 0.57156 0.57156 0.57156 0.578125 0.578125 0.578125 0.579477 0.579477 0.579477 0.59375 0.59375 0.59375 0.595309 0.595309 0.595309 0.609375 0.609375 0.609375 0.611144 0.611144 0.611144 0.625 0.625 0.625 0.626971 0.626971 0.626971 0.642803 0.642803 0.642803 0.65625 0.65625 0.65625 0.658635 0.658635 0.658635 0.6875 0.6875 0.6875 0.690302 0.690302 0.690302 0.71875 0.71875 0.71875 0.721961 0.721961 0.721961 0.75 0.75 0.75 0.753625 0.753625 0.753625 0.78125 0.78125 0.78125 0.785287 0.785287 0.785287 0.8125 0.8125 0.8125 0.816949 0.816949 0.816949 0.875 0.875 0.875 0.880274 0.880274 0.880274 0.9375 0.9375 0.9375 0.943598 0.943598 0.943598 0.97526 0.97526 0.97526 1 1 1 1
  arc A0 (14.5075, 0) -> (17.2168, 0) centre (15.8621, 58.4021) ccw
  line L0 (150, 0) -> (17.2168, 0)
  line L1 (16.1571, 0) -> (24.1571, 0)
  point P0 (0, 0)
extrude "Выдавливание1" add sketch "Эскиз1" along normal blind 520
sketch "Эскиз2" plane through (0, 0, 0) normal (0, 0, -1) x (-1, 0, 0)
  point P0 (0, 0)
sketch "Эскиз3" plane through (0, 0, 520) normal (0, 0, 1) x (1, 0, 0)
  line L0 (56.9547, 0) -> (61.9547, 0) construction
  circle A0 centre (38.5008, 6) radius 5
  circle A1 centre (78.7009, 6) radius 5
  arc A2 (14.5075, 0) -> (17.2168, 0) centre (15.8621, 58.4021) ccw projected
  line L1 (17.2168, 0) -> (150, 0) projected
  line L2 (17.2168, 0) -> (150, 0) projected
  line L3 (38.5008, 0) -> (38.5008, 6)
  line L4 (38.5008, 0) -> (44.5008, 0) construction
  dimension "d4" = 10
  dimension "d7" = 6
  dimension "d8" = 90
extrude "Выдавливание2" cut sketch "Эскиз3" against normal blind 200
properties part number "полукрыло"
